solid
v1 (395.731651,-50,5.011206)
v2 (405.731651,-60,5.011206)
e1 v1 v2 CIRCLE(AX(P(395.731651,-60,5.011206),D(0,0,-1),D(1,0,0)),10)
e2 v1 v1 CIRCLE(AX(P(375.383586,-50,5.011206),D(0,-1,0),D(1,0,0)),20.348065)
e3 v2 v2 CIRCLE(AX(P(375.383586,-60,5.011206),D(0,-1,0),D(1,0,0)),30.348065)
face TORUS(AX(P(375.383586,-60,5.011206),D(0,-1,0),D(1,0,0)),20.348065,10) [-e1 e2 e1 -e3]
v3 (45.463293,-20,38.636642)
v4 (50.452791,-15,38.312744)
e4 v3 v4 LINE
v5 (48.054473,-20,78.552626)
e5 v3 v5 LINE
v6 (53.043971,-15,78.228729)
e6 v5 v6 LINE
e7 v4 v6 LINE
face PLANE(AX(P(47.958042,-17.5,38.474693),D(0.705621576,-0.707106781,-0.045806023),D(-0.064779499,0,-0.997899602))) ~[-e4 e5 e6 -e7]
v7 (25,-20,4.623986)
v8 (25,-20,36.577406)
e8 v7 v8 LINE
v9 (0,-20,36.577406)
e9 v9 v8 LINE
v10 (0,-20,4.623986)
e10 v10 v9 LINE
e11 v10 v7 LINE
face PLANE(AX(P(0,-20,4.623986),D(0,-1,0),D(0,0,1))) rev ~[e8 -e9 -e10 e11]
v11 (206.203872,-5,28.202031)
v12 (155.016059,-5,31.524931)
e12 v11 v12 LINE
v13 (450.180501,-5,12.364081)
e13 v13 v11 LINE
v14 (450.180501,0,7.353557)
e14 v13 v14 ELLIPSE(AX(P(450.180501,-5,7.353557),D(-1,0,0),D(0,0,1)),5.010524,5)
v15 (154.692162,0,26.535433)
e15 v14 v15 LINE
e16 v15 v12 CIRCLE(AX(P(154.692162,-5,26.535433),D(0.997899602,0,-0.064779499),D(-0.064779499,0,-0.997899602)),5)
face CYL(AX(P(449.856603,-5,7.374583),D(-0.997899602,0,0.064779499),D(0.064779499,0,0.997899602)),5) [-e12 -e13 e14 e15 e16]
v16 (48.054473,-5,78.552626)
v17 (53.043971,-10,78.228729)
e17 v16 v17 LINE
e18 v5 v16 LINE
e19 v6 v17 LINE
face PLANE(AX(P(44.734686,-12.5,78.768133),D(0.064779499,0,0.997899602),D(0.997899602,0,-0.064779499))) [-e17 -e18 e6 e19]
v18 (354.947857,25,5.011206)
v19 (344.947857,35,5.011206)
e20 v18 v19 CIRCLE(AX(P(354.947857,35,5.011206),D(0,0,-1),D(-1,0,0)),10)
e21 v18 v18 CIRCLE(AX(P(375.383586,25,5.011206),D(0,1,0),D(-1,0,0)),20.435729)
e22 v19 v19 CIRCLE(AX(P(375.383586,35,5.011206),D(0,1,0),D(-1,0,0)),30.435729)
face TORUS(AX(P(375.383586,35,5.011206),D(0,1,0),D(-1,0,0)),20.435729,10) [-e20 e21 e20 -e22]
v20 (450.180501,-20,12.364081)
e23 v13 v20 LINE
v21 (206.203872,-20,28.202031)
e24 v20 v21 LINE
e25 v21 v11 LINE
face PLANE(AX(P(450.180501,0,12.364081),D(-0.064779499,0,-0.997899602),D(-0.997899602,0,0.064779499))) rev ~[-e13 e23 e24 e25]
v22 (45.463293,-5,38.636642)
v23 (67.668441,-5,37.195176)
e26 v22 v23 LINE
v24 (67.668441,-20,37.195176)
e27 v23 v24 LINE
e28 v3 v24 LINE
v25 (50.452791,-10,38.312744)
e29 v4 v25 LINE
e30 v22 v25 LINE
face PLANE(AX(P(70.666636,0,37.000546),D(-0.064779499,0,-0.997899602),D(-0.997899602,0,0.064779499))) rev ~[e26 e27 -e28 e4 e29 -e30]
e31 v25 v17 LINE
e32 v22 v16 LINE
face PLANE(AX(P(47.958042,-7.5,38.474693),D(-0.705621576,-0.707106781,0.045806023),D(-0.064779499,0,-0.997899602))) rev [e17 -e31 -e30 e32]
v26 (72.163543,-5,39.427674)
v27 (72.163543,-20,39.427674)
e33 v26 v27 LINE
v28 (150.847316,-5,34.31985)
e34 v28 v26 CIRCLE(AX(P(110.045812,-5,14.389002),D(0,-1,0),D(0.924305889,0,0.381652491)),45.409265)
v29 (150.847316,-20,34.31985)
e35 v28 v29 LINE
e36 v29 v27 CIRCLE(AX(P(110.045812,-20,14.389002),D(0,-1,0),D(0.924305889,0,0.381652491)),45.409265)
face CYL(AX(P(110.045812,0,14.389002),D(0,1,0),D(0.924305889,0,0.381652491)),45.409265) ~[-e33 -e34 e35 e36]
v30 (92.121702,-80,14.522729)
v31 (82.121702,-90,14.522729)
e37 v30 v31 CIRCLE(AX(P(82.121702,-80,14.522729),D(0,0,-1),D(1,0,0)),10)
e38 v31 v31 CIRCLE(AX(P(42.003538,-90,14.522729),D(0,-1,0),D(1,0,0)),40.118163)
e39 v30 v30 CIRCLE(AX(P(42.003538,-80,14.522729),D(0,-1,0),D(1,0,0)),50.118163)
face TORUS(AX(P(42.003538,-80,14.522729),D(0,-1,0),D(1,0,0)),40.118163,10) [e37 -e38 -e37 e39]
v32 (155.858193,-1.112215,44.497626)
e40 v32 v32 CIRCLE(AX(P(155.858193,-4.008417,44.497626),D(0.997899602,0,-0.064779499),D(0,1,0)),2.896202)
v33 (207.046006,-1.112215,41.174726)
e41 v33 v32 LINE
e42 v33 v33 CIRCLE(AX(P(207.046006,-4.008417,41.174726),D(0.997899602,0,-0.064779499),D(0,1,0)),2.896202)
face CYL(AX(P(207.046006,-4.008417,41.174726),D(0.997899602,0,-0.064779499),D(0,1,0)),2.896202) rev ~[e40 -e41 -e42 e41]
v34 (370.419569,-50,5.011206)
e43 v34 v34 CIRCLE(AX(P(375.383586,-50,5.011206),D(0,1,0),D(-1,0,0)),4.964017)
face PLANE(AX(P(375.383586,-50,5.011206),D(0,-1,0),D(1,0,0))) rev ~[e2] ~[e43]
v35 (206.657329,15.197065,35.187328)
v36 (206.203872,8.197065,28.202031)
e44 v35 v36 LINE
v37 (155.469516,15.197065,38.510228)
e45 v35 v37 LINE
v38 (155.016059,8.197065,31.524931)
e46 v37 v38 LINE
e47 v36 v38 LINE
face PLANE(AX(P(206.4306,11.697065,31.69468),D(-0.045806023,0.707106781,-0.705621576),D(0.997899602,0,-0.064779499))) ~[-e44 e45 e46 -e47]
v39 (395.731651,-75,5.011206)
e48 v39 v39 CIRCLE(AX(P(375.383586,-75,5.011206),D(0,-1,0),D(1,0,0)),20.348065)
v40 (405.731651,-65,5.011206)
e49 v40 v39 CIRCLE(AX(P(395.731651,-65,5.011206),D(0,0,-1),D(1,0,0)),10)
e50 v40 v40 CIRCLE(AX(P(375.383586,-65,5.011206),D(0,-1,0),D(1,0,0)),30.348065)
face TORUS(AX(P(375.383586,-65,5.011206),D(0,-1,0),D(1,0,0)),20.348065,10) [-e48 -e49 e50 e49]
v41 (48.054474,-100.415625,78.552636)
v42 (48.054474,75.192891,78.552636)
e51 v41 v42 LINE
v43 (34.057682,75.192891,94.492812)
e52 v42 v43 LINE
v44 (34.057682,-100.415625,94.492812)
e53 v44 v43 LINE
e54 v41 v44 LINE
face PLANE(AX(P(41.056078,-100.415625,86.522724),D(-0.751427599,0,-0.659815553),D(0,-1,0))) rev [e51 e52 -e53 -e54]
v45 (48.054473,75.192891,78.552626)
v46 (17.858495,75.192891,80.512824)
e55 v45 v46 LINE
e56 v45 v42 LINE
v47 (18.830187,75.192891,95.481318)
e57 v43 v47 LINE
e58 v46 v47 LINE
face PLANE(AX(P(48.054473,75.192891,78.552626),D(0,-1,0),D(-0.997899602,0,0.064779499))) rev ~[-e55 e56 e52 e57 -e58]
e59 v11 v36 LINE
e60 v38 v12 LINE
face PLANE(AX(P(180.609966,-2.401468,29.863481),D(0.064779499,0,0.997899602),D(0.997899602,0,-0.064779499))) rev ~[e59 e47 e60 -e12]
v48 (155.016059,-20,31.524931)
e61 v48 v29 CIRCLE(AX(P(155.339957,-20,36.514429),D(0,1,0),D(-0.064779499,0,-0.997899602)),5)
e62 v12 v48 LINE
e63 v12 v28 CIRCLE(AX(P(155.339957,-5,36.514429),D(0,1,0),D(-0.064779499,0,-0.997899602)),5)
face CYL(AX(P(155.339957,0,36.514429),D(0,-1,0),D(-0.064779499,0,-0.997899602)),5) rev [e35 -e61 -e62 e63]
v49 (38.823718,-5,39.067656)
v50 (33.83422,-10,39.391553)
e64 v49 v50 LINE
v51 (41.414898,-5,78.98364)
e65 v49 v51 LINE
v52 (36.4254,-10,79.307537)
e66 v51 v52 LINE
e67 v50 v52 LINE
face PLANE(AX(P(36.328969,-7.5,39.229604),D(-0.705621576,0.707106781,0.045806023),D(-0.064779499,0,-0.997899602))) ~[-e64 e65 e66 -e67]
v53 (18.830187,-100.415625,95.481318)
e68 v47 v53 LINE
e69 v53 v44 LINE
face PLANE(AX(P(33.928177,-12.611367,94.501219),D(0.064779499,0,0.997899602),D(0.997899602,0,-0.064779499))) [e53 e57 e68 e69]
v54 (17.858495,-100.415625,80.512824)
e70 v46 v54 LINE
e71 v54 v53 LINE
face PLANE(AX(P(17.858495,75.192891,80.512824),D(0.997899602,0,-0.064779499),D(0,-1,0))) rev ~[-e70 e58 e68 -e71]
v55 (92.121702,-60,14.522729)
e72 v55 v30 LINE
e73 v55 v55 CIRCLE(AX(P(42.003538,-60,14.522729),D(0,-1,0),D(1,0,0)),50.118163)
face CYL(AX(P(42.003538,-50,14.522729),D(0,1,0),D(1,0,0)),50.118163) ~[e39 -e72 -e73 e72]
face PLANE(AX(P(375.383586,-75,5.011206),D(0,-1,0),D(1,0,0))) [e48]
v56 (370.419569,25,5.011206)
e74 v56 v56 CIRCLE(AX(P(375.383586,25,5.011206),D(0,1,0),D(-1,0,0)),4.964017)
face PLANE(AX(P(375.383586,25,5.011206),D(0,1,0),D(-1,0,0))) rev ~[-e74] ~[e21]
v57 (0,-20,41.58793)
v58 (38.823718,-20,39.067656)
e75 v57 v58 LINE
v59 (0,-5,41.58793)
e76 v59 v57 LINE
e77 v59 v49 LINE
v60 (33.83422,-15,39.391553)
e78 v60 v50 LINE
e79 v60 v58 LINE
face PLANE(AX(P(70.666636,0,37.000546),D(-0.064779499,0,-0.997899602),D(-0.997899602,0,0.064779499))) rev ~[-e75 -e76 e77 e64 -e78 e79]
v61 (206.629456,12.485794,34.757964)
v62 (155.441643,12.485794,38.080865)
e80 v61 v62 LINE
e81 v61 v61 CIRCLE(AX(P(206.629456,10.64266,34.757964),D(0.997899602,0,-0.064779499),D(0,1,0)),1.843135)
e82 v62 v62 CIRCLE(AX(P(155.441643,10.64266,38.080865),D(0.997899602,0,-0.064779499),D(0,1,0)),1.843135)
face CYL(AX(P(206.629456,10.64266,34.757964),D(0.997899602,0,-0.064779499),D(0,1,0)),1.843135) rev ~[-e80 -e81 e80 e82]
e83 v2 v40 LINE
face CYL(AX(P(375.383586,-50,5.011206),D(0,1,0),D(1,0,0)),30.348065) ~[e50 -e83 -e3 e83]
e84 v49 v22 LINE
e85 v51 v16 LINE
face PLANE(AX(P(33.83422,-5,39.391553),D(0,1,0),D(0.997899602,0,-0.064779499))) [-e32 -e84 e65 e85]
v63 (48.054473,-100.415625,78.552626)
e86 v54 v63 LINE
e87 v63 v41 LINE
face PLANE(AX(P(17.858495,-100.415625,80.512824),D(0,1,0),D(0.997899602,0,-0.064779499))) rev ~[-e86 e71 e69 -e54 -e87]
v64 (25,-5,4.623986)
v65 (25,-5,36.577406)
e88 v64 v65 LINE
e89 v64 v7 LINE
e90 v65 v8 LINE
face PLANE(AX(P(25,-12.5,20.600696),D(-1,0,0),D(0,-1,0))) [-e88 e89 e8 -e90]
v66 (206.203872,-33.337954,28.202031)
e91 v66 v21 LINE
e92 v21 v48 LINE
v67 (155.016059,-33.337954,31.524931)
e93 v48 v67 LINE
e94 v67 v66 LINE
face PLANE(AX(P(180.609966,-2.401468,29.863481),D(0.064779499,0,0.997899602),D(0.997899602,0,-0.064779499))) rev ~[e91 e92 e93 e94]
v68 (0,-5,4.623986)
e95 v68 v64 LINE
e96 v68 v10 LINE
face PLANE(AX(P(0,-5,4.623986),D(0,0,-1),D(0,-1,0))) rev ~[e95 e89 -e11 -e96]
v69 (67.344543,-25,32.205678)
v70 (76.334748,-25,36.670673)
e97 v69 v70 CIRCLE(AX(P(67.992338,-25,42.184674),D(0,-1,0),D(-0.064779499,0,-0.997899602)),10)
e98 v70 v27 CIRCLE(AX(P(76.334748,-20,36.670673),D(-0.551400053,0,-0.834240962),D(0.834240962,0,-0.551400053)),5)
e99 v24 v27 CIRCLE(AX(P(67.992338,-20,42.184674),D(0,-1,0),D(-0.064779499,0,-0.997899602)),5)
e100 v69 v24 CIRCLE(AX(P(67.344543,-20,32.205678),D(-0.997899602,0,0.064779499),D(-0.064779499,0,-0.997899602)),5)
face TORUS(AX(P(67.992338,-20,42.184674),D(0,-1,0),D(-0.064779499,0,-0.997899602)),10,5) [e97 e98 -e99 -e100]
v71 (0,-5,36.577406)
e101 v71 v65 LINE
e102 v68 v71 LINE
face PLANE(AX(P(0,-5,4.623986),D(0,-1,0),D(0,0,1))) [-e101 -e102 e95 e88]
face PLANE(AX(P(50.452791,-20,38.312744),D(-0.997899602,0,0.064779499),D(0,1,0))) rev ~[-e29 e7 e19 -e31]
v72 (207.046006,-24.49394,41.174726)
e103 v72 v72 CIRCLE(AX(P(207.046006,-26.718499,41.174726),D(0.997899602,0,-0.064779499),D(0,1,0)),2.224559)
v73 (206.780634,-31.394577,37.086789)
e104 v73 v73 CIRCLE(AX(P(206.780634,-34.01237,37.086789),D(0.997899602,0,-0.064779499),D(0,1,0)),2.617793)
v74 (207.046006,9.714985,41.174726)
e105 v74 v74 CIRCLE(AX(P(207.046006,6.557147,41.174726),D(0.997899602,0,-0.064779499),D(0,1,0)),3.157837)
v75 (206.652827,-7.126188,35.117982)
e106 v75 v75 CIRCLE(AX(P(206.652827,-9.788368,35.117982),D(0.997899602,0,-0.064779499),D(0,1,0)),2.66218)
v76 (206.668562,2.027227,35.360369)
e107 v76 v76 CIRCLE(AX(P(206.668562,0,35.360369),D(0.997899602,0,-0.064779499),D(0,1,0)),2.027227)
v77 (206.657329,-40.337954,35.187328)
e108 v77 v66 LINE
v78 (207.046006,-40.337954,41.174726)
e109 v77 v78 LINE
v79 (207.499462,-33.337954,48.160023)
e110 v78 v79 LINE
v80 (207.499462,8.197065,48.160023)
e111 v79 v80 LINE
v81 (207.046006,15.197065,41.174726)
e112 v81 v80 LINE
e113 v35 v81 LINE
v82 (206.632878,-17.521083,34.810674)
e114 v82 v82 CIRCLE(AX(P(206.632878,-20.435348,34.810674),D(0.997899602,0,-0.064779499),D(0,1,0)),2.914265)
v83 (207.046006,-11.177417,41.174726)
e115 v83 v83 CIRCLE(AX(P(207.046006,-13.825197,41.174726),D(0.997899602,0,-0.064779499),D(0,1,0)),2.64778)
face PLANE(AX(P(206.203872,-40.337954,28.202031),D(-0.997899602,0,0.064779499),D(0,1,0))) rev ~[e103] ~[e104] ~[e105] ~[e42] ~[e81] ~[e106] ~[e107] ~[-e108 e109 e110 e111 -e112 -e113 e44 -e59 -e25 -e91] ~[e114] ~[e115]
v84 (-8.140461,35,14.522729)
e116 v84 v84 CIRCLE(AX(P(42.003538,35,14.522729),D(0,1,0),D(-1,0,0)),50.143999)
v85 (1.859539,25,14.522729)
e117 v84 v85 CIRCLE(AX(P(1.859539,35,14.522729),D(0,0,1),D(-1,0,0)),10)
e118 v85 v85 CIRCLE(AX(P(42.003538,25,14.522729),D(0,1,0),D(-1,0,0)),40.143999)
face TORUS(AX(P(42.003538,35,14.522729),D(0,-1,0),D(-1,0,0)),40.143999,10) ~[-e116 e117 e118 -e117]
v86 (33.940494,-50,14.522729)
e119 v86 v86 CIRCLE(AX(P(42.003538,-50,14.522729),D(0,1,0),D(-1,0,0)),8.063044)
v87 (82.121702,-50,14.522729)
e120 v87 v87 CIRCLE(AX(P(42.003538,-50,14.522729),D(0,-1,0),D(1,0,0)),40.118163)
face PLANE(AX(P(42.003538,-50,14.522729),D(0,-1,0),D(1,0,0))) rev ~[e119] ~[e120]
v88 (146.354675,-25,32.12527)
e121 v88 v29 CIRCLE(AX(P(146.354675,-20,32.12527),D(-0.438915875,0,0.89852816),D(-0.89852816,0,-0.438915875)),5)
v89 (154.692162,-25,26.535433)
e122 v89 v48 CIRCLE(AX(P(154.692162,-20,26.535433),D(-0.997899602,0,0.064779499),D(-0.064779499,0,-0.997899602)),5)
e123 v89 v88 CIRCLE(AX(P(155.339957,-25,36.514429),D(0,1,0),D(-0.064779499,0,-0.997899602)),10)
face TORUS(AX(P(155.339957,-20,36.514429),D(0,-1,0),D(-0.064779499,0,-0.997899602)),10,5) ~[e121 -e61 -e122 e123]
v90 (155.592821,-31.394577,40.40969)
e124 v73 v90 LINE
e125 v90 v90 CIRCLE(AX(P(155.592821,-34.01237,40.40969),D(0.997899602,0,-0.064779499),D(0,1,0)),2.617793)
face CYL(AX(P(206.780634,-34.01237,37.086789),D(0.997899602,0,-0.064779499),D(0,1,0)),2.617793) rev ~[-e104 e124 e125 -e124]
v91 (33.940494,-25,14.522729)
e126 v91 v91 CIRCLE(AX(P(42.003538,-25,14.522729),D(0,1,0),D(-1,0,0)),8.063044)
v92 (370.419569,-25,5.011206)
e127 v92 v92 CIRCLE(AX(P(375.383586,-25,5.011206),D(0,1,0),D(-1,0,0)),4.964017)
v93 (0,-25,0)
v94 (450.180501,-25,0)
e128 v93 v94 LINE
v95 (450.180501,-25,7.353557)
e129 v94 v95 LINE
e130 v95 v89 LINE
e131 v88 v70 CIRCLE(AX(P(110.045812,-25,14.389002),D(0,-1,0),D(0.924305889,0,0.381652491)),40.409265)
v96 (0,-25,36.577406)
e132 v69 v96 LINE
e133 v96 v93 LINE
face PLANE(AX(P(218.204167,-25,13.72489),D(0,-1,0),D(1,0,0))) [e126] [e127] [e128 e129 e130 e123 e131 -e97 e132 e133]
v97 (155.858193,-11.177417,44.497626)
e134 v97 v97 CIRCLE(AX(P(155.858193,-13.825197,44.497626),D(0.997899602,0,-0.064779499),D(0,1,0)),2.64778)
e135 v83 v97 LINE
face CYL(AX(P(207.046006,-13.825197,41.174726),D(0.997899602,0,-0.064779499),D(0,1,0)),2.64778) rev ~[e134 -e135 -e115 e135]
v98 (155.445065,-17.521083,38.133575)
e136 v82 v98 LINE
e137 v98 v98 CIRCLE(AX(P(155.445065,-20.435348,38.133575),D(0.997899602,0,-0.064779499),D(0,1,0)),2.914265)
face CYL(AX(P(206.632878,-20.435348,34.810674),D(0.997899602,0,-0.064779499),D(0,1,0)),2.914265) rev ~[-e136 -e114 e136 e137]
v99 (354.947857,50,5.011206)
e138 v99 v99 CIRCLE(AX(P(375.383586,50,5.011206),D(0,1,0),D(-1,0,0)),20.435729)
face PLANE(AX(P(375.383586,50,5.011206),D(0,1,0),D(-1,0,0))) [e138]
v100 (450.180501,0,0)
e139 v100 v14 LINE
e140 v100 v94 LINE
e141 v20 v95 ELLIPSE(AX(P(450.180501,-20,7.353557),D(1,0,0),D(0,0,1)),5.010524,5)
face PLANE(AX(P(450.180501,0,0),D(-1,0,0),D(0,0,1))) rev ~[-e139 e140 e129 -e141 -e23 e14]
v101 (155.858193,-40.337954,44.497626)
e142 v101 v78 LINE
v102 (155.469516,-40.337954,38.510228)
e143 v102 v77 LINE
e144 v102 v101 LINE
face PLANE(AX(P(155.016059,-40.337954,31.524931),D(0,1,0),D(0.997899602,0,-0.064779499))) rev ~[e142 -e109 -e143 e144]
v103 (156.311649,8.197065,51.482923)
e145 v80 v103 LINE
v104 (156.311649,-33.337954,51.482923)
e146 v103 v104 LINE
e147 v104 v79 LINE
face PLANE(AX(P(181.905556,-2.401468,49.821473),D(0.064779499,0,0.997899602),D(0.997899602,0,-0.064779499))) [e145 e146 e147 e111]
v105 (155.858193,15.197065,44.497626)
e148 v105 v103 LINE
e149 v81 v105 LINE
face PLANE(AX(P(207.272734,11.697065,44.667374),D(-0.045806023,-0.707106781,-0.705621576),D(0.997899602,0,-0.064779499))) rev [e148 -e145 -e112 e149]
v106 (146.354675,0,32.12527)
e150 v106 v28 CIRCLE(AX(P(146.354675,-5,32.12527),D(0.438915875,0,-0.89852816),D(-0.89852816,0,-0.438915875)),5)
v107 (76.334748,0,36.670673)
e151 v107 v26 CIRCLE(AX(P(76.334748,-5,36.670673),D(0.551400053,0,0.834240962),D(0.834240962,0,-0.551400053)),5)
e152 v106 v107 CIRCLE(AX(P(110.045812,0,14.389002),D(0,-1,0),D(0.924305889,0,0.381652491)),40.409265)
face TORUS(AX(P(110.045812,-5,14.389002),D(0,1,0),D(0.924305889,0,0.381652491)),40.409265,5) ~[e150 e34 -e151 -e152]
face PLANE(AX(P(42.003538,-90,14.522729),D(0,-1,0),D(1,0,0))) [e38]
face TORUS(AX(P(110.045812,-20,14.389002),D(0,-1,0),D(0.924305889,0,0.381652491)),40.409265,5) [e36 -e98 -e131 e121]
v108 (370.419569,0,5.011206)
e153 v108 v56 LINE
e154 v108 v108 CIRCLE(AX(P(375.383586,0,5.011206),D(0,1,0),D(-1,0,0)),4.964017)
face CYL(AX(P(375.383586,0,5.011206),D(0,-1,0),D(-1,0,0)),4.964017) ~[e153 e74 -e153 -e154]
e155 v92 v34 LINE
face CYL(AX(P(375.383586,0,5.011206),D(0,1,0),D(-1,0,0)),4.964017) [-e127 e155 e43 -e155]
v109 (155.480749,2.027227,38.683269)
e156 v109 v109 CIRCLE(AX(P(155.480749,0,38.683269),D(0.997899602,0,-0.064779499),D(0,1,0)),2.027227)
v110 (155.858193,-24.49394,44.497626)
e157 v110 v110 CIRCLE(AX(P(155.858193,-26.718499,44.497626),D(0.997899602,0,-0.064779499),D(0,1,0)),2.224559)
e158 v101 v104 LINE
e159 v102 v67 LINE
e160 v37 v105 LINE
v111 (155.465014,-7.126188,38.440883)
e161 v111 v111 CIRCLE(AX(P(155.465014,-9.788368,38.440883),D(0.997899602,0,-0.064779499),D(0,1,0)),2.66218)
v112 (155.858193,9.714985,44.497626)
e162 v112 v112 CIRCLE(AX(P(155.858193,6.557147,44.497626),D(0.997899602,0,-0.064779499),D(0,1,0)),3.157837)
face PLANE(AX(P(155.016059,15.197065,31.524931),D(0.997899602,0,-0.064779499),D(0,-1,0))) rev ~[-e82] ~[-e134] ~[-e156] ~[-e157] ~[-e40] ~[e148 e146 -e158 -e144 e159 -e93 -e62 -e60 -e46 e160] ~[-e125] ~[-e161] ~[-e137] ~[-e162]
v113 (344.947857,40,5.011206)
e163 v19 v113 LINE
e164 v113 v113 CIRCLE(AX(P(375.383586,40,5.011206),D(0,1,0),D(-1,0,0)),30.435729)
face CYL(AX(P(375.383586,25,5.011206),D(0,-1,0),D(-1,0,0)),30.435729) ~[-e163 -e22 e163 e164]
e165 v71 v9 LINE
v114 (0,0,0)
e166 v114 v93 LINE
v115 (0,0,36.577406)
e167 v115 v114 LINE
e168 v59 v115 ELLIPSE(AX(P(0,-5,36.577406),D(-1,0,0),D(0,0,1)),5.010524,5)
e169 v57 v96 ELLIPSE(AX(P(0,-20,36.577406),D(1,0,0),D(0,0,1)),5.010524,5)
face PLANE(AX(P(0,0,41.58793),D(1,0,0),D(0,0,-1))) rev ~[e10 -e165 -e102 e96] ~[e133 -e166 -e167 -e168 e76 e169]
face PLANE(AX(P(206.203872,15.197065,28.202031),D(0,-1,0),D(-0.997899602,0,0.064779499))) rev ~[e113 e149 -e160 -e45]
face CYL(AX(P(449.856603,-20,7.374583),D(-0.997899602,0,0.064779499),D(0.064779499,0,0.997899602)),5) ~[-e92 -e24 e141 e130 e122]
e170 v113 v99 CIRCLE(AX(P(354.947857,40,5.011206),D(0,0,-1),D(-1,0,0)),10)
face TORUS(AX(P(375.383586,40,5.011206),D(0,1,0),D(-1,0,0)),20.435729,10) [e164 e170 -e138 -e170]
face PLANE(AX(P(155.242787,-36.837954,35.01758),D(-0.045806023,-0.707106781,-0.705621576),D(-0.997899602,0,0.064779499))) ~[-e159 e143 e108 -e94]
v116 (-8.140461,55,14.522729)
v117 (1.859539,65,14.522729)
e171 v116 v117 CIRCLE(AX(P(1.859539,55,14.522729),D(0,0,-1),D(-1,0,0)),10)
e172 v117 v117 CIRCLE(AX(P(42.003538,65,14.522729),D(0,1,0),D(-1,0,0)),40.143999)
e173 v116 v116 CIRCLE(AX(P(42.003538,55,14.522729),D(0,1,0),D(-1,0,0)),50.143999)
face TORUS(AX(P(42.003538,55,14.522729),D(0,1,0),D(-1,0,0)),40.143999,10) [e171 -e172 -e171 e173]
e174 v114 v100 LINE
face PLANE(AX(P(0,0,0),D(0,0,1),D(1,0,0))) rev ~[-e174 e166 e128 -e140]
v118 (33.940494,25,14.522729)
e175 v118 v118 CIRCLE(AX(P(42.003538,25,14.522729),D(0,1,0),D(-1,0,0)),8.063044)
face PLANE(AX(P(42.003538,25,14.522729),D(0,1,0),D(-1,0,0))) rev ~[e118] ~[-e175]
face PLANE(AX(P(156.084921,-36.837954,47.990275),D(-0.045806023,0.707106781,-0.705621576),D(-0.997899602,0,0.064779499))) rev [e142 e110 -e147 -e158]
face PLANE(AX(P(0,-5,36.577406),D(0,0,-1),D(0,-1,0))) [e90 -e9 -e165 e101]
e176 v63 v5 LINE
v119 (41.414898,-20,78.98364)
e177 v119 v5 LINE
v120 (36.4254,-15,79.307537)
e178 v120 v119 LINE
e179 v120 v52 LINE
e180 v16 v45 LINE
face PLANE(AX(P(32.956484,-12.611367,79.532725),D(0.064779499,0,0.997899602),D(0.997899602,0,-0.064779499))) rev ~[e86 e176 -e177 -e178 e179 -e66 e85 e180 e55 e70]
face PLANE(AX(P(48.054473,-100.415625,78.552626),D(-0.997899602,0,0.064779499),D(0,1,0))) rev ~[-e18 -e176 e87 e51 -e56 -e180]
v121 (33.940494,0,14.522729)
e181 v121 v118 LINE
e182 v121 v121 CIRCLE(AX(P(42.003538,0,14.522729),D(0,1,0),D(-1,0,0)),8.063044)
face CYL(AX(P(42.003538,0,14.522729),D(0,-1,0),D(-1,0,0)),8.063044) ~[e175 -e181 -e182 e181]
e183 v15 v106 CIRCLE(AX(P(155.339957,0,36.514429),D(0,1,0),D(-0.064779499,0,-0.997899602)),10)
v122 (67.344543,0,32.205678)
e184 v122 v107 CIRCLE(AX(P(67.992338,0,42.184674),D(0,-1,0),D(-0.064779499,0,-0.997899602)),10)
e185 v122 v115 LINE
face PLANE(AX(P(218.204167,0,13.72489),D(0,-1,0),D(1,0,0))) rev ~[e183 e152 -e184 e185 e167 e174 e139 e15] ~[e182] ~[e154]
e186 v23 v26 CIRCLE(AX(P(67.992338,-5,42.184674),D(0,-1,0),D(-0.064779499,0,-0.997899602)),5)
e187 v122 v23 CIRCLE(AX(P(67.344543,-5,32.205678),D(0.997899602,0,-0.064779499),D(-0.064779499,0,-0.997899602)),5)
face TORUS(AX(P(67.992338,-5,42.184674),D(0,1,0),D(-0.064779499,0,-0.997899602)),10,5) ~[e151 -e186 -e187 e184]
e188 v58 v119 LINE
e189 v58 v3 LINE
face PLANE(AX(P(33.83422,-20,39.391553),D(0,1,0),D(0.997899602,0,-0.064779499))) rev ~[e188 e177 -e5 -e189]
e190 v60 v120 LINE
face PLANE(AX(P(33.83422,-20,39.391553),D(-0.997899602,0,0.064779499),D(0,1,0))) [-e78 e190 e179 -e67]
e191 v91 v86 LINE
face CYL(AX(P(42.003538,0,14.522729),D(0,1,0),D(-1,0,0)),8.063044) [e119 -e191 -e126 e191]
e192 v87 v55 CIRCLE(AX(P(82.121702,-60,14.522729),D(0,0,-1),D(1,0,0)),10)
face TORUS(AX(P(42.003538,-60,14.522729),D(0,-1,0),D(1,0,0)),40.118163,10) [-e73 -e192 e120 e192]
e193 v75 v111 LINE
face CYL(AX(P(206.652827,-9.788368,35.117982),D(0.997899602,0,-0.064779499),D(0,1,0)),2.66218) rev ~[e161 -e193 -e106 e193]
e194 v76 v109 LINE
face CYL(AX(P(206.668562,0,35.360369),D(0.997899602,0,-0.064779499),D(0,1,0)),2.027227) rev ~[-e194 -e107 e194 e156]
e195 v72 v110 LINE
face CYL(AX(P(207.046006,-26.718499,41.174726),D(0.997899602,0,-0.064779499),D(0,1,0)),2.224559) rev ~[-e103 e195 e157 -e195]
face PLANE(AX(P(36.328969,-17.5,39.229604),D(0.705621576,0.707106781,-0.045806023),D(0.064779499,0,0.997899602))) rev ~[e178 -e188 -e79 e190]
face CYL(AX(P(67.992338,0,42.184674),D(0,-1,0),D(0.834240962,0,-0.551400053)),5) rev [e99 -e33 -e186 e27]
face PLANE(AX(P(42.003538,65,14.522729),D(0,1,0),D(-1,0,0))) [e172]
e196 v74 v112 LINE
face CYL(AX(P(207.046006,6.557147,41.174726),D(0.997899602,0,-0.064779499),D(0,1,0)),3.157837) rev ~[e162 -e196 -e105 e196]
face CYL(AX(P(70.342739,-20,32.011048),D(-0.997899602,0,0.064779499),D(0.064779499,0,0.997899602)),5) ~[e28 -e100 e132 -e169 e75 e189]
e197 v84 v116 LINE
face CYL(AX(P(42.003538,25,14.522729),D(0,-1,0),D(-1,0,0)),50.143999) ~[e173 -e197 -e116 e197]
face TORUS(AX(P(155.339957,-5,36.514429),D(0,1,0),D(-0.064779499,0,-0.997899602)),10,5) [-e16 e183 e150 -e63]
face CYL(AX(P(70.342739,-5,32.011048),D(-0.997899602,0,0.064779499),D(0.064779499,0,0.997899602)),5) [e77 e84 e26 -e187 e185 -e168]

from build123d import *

# Parameters (mm, degrees)
F1_DEPTH  = 25
F2_R      = 5
F3_W      = 51.2955540023
F3_H      = 20.3379537165
F4_DEPTH  = 20
F5_SIZE   = 7
F6_R      = 2.6177928451
F6_R_2    = 2.224559375
F6_R_3    = 2.9142650528
F6_R_4    = 2.6477797202
F6_R_5    = 2.6621803072
F6_R_6    = 2.8962018761
F6_R_7    = 2.0272267168
F6_R_8    = 3.1578374874
F6_R_9    = 1.8431345388
F7_DEPTH  = 55
F8_R      = 8.0630442653
F8_R_2    = 4.9640165804
F9_DEPTH  = 25
F10_DEPTH = 50
F11_R     = 30.4357287845
F12_DEPTH = 25
F13_R     = 30.3480649607
F14_DEPTH = 25
F15_R     = 50.1181633855
F16_DEPTH = 40
F17_R     = 50.1439992572
F18_DEPTH = 40
F19_R     = 10
F20_W     = 15
F20_H     = 31.953419765
F21_DEPTH = 25
F22_W     = 16.6535501336
F22_H     = 15
F23_DEPTH = 40
F24_SIZE  = 5
F26_DEPTH = 15
F27_SIZE  = 14.99999


# Not quite as in the source:
# - a fillet or chamfer is up to 0.001 mm smaller than in the source, because OpenCascade refuses the exact size


with BuildPart() as f1:
    # F0 (on Front) → F1 (new body)
    with BuildSketch(Plane.XZ):
        Polygon((0, 41.5879301727), (0, 0), (450.1805007458, 0), (450.1805007458, 12.3640811071), (152.0178636457, 31.719561607), (70.666636126, 37.0005455465), align=None)
        with BuildLine():
            ThreePointArc((152.0178636457, 31.719561607), (112.9874016283, 59.702890297), (70.666636126, 37.0005455465))
            Line((70.666636126, 37.0005455465), (152.0178636457, 31.719561607))
        make_face()
    extrude(amount=F1_DEPTH)

    # F2
    f2_edges = [f1.edges().sort_by_distance(p)[0] for p in [
        (112.987402, -25, 59.70289),
        (112.987402, 0, 59.70289),
        (152.017864, -12.5, 31.719562),
        (301.099182, 0, 22.041821),
        (301.099182, -25, 22.041821),
        (70.666636, -12.5, 37.000546),
        (35.333318, 0, 39.294238),
        (35.333318, -25, 39.294238),
    ]]
    fillet(f2_edges, radius=F2_R)

    # F3 (on face) → F4 (join)
    with BuildSketch(Plane(origin=(2.6883867209, 0, 41.4134112683), x_dir=(0.9978996024, 0, -0.0647794991), z_dir=(0.0647794991, 0, 0.9978996024))):
        Polygon((152.6482946076, 15.1970647275), (152.6482946076, -20), (203.9438486099, -20), (203.9438486099, -5), (203.9438486099, 15.1970647275), align=None)
        with Locations((178.2960716088, -30.1689768583)):
            Rectangle(F3_W, F3_H)
    extrude(amount=F4_DEPTH)

    # F5
    f5_edges = [f1.edges().sort_by_distance(p)[0] for p in [
        (181.905556, -40.337954, 49.821473),
        (180.609966, -40.337954, 29.863481),
        (181.905556, 15.197065, 49.821473),
        (180.609966, 15.197065, 29.863481),
    ]]
    chamfer(f5_edges, length=F5_SIZE)

    # F6 (on face) → F7 (cut)
    with BuildSketch(Plane(origin=(203.5154854418, 0, -13.2113803668), x_dir=(0, 1, 0), z_dir=(0.9978996024, 0, -0.0647794991))):
        with Locations((-34.0123698115, 50.4040382802)):
            Circle(F6_R)
        with Locations((-26.718499139, 54.5005789844)):
            Circle(F6_R_2)
        with Locations((-20.4353481531, 48.1231324375)):
            Circle(F6_R_3)
        with Locations((-13.8251967728, 54.5005789844)):
            Circle(F6_R_4)
        with Locations((-9.7883678973, 48.4310872853)):
            Circle(F6_R_5)
        with Locations((-4.0084165521, 54.5005789844)):
            Circle(F6_R_6)
        with Locations((0, 48.6739836633)):
            Circle(F6_R_7)
        with Locations((6.5571470186, 54.5005789844)):
            Circle(F6_R_8)
        with Locations((10.6426598504, 48.0703115463)):
            Circle(F6_R_9)
    extrude(amount=-F7_DEPTH, mode=Mode.SUBTRACT)

    # F8 (on face) → F9 (join)
    with BuildSketch(Plane(origin=(0, 0, 0), x_dir=(-1, 0, 0), z_dir=(0, 1, 0))):
        with Locations((-42.0035384595, 14.5227285102)):
            Circle(F8_R)
        with Locations((-375.3835856915, 5.0112064928)):
            Circle(F8_R_2)
    extrude(amount=F9_DEPTH)

    # F8 (on face) → F10 (join)
    with BuildSketch(Plane(origin=(0, 0, 0), x_dir=(-1, 0, 0), z_dir=(0, 1, 0))):
        with Locations((-42.0035384595, 14.5227285102)):
            Circle(F8_R)
        with Locations((-375.3835856915, 5.0112064928)):
            Circle(F8_R_2)
    extrude(amount=-F10_DEPTH)

    # F11 (on face) → F12 (join)
    with BuildSketch(Plane(origin=(0, 25, 0), x_dir=(-1, 0, 0), z_dir=(0, 1, 0))):
        with Locations((-375.3835856915, 5.0112064928)):
            Circle(F11_R)
    extrude(amount=F12_DEPTH)

    # F13 (on face) → F14 (join)
    with BuildSketch(Plane.XZ.offset(50)):
        with Locations((375.3835856915, 5.0112064928)):
            Circle(F13_R)
    extrude(amount=F14_DEPTH)

    # F15 (on face) → F16 (join)
    with BuildSketch(Plane.XZ.offset(50)):
        with Locations((42.0035384595, 14.5227285102)):
            Circle(F15_R)
    extrude(amount=F16_DEPTH)

    # F17 (on face) → F18 (join)
    with BuildSketch(Plane(origin=(0, 25, 0), x_dir=(-1, 0, 0), z_dir=(0, 1, 0))):
        with Locations((-42.0035384595, 14.5227285102)):
            Circle(F17_R)
    extrude(amount=F18_DEPTH)

    # F19
    f19_edges = [f1.edges().sort_by_distance(p)[0] for p in [
        (92.147538, 65, 14.522729),
        (92.147538, 25, 14.522729),
        (-8.114625, -50, 14.522729),
        (-8.114625, -90, 14.522729),
        (345.035521, -75, 5.011206),
        (345.035521, -50, 5.011206),
        (405.819314, 25, 5.011206),
        (405.819314, 50, 5.011206),
    ]]
    fillet(f19_edges, radius=F19_R)

    # F20 (on face) → F21 (cut)
    with BuildSketch(Plane(origin=(0, 0, 0), x_dir=(0, -1, 0), z_dir=(-1, 0, 0))):
        with Locations((12.5, 20.6006961975)):
            Rectangle(F20_W, F20_H)
    extrude(amount=-F21_DEPTH, mode=Mode.SUBTRACT)

    # F22 (on face) → F23 (join)
    with BuildSketch(Plane(origin=(2.6883867209, 0, 41.4134112683), x_dir=(0.9978996024, 0, -0.0647794991), z_dir=(0.0647794991, 0, 0.9978996024))):
        with Locations((39.5381649507, -12.5)):
            Rectangle(F22_W, F22_H)
    extrude(amount=F23_DEPTH)

    # F24
    f24_edges = [f1.edges().sort_by_distance(p)[0] for p in [
        (35.12981, -5, 59.349545),
        (51.748381, -5, 58.270736),
        (51.748381, -20, 58.270736),
        (35.12981, -20, 59.349545),
    ]]
    chamfer(f24_edges, length=F24_SIZE)

    # F25 (on face) → F26 (join)
    with BuildSketch(Plane(origin=(5.2795666867, 0, 81.3293953647), x_dir=(0.9978996024, 0, -0.0647794991), z_dir=(0.0647794991, 0, 0.9978996024))):
        Polygon((42.8649400175, -100.4156246781), (42.8649400175, -20), (42.8649400175, -5), (42.8649400175, 75.1928910613), (12.6054044813, 75.1928910613), (12.6054044813, -100.4156246781), align=None)
    extrude(amount=F26_DEPTH)

    # F27 (size 15 in the source; OpenCascade refuses exactly that, so slightly less here)
    f27_edges = [f1.edges().sort_by_distance(p)[0] for p in [
        (49.026166, -12.611367, 93.52112),
    ]]
    chamfer(f27_edges, length=F27_SIZE)


solid = f1.part
